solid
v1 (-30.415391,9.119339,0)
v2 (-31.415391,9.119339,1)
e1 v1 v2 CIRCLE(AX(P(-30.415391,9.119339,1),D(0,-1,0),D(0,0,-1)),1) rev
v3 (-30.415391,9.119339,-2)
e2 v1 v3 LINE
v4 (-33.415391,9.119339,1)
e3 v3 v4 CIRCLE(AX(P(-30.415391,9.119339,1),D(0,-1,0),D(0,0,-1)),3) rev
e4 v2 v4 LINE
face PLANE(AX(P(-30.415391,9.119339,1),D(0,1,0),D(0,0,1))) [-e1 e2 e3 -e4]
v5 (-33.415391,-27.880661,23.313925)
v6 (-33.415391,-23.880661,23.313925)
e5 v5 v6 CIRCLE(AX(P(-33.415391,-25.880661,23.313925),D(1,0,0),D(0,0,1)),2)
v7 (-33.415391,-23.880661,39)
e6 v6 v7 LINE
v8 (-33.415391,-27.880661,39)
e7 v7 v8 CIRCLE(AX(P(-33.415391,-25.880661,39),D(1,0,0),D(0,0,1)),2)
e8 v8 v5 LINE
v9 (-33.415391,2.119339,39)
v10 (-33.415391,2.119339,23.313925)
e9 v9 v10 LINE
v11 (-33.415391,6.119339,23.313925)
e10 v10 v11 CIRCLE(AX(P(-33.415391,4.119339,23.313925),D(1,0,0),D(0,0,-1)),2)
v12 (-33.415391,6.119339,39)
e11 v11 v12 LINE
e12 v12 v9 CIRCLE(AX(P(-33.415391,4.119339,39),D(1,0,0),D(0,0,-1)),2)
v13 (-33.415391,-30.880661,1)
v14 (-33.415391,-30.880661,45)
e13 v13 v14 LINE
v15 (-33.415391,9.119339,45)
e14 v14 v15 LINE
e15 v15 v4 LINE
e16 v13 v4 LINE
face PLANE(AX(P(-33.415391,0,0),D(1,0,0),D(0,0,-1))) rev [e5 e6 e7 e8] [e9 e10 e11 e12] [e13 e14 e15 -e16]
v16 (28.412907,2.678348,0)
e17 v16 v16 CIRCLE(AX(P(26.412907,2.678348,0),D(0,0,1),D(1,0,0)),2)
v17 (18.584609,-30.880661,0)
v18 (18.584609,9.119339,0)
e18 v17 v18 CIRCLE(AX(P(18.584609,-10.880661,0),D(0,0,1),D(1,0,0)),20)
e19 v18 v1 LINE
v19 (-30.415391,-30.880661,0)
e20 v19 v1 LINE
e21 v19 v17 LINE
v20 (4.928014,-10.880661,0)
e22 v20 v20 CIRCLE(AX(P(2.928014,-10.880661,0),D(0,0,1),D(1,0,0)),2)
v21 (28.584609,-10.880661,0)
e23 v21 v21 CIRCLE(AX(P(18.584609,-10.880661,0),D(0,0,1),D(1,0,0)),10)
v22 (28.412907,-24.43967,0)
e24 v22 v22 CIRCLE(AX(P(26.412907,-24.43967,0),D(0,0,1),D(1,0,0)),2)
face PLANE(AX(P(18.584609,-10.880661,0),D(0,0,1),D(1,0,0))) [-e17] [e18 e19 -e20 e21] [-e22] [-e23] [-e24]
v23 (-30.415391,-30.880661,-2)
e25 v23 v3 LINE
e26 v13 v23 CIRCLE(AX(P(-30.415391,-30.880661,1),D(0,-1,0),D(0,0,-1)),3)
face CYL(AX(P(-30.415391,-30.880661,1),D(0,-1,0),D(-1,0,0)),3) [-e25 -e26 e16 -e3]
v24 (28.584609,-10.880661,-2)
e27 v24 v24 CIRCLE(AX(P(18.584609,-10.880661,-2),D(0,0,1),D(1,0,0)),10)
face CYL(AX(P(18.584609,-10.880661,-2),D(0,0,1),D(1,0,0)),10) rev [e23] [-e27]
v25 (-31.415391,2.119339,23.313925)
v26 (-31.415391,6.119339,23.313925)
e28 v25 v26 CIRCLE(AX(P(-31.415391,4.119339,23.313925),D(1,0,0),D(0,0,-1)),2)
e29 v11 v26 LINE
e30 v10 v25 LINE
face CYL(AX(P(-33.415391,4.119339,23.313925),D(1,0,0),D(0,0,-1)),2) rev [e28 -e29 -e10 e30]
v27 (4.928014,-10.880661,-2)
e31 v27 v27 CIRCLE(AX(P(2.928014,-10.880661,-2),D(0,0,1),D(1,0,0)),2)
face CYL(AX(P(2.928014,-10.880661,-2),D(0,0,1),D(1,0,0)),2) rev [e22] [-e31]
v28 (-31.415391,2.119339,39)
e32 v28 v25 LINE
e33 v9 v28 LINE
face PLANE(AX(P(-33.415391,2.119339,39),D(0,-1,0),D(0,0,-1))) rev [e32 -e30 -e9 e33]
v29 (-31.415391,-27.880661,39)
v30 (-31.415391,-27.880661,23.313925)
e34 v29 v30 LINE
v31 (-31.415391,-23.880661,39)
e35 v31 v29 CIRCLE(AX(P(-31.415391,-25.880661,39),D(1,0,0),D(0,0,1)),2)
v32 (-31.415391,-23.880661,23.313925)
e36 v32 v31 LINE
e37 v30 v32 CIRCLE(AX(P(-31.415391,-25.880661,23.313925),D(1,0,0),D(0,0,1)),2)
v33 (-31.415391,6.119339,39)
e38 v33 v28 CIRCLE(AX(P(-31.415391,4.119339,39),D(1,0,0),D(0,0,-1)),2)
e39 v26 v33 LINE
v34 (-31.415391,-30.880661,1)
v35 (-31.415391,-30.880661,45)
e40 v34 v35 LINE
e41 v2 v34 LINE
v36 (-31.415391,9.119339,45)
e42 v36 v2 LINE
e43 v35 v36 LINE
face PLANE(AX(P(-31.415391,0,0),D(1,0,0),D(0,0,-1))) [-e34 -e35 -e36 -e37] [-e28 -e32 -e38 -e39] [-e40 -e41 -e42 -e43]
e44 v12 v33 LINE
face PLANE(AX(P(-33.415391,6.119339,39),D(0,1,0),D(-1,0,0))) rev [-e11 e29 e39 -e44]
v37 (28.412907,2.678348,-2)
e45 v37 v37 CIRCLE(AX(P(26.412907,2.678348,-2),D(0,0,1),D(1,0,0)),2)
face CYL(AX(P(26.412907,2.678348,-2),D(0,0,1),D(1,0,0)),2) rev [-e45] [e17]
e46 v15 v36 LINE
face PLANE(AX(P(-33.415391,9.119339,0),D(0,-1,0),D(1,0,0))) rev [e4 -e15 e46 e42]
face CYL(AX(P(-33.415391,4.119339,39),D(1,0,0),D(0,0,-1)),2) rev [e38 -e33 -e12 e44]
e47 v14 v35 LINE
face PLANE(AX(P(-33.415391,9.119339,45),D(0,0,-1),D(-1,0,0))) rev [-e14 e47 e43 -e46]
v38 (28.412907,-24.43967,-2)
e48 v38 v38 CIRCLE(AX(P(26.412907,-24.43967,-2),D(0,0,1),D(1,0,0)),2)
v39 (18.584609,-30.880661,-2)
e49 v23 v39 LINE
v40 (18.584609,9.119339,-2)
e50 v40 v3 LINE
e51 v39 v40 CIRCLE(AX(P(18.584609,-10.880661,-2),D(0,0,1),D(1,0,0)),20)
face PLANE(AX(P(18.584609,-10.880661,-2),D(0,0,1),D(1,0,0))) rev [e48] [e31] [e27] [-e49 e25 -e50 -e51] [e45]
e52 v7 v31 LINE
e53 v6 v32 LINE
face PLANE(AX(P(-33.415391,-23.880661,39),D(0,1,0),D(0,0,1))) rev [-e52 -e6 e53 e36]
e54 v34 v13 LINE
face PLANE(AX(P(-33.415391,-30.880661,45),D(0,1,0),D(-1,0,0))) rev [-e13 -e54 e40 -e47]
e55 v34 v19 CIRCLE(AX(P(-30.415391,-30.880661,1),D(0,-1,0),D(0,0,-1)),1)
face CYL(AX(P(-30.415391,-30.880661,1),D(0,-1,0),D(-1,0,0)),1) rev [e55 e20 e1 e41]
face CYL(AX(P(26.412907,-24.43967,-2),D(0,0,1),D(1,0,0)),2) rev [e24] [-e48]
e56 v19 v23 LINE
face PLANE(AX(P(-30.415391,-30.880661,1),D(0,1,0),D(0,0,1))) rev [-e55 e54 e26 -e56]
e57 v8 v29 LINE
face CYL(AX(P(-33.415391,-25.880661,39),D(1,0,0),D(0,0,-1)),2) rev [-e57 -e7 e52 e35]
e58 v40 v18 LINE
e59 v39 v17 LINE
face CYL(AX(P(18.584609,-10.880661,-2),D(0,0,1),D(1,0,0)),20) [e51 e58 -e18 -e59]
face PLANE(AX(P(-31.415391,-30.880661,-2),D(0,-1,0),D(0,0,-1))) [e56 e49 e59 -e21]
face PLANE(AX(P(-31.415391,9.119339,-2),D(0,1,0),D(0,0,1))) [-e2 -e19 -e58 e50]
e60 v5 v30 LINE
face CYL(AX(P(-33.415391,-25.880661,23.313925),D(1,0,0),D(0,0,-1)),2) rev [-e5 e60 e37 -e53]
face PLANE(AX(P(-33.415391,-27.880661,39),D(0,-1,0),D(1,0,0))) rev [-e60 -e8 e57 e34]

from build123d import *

# Parameters (mm, degrees)
SM_BASE_FLANGE_1_DEPTH           = 2
SKETCH_7_R                       = 10
SKETCH_7_R_2                     = 2
CUT_EXTRUDE_1_DEPTH              = 50.460967207
SM_EDGE_FLANGE_1_STRIP_W         = 10
SM_EDGE_FLANGE_1_STRIP_H         = 2
SM_EDGE_FLANGE_1_STRIP_CUT_DEPTH = 40
SM_EDGE_FLANGE_1_DEPTH           = 40
CUT_EXTRUDE_2_DEPTH              = 89.761563758


# Sheet-metal steps are written as plain solids
with BuildPart() as part:
    # Sketch 1 → 基体-法兰1 (new body)
    with BuildSketch(Plane.XY):
        with BuildLine():
            Line((-31.41539068, 9.119339374), (18.58460932, 9.119339374))
            ThreePointArc((18.58460932, 9.119339374), (38.58460932, -10.880660626), (18.58460932, -30.880660626))
            Line((18.58460932, -30.880660626), (-31.41539068, -30.880660626))
            Line((-31.41539068, -30.880660626), (-31.41539068, 9.119339374))
        make_face()
    extrude(amount=-SM_BASE_FLANGE_1_DEPTH)

    # 草图7 → 切除-拉伸1 (cut, through all)
    with BuildSketch(Plane.XY):
        with Locations((18.58460932, -10.880660626)):
            Circle(SKETCH_7_R)
        with Locations((2.928014356, -10.880660626)):
            Circle(SKETCH_7_R_2)
        with Locations((26.412906802, 2.67834835)):
            Circle(SKETCH_7_R_2)
        with Locations((26.412906802, -24.439669602)):
            Circle(SKETCH_7_R_2)
    extrude(amount=-CUT_EXTRUDE_1_DEPTH, mode=Mode.SUBTRACT)

    # 边线-法兰1 strip (across the edge) → 边线-法兰1 strip cut (cut)
    with BuildSketch(Plane(origin=(-31.41539068, 9.119339374, 0), x_dir=(1, 0, 0), z_dir=(0, -1, 0))):
        with Locations((-4, -1)):
            Rectangle(SM_EDGE_FLANGE_1_STRIP_W, SM_EDGE_FLANGE_1_STRIP_H)
    extrude(amount=SM_EDGE_FLANGE_1_STRIP_CUT_DEPTH, mode=Mode.SUBTRACT)

    # 边线-法兰1 section (across the edge) → 边线-法兰1 (add)
    with BuildSketch(Plane(origin=(-31.41539068, 9.119339374, 0), x_dir=(1, 0, 0), z_dir=(0, -1, 0))):
        with BuildLine():
            Line((-2, 1), (-2, 45))
            Line((-2, 45), (0, 45))
            Line((0, 45), (0, 1))
            ThreePointArc((0, 1), (0.292893219, 0.292893219), (1, 0))
            Line((1, 0), (1, -2))
            ThreePointArc((1, -2), (-1.121320344, -1.121320344), (-2, 1))
        make_face()
    extrude(amount=SM_EDGE_FLANGE_1_DEPTH)

    # 草图11 → 切除-拉伸2 (cut, through all)
    with BuildSketch(Plane(origin=(-31.41539068, 0, 0), x_dir=(0, 0, -1), z_dir=(1, 0, 0))):
        with BuildLine():
            Line((-39, 6.119339374), (-23.313924612, 6.119339374))
            ThreePointArc((-23.313924612, 6.119339374), (-21.313924612, 4.119339374), (-23.313924612, 2.119339374))
            Line((-23.313924612, 2.119339374), (-39, 2.119339374))
            ThreePointArc((-39, 2.119339374), (-41, 4.119339374), (-39, 6.119339374))
        make_face()
        with BuildLine():
            Line((-39, -27.880660626), (-23.313924612, -27.880660626))
            ThreePointArc((-23.313924612, -27.880660626), (-21.313924612, -25.880660626), (-23.313924612, -23.880660626))
            Line((-23.313924612, -23.880660626), (-39, -23.880660626))
            ThreePointArc((-39, -23.880660626), (-41, -25.880660626), (-39, -27.880660626))
        make_face()
    extrude(amount=-CUT_EXTRUDE_2_DEPTH, mode=Mode.SUBTRACT)


solid = part.part
